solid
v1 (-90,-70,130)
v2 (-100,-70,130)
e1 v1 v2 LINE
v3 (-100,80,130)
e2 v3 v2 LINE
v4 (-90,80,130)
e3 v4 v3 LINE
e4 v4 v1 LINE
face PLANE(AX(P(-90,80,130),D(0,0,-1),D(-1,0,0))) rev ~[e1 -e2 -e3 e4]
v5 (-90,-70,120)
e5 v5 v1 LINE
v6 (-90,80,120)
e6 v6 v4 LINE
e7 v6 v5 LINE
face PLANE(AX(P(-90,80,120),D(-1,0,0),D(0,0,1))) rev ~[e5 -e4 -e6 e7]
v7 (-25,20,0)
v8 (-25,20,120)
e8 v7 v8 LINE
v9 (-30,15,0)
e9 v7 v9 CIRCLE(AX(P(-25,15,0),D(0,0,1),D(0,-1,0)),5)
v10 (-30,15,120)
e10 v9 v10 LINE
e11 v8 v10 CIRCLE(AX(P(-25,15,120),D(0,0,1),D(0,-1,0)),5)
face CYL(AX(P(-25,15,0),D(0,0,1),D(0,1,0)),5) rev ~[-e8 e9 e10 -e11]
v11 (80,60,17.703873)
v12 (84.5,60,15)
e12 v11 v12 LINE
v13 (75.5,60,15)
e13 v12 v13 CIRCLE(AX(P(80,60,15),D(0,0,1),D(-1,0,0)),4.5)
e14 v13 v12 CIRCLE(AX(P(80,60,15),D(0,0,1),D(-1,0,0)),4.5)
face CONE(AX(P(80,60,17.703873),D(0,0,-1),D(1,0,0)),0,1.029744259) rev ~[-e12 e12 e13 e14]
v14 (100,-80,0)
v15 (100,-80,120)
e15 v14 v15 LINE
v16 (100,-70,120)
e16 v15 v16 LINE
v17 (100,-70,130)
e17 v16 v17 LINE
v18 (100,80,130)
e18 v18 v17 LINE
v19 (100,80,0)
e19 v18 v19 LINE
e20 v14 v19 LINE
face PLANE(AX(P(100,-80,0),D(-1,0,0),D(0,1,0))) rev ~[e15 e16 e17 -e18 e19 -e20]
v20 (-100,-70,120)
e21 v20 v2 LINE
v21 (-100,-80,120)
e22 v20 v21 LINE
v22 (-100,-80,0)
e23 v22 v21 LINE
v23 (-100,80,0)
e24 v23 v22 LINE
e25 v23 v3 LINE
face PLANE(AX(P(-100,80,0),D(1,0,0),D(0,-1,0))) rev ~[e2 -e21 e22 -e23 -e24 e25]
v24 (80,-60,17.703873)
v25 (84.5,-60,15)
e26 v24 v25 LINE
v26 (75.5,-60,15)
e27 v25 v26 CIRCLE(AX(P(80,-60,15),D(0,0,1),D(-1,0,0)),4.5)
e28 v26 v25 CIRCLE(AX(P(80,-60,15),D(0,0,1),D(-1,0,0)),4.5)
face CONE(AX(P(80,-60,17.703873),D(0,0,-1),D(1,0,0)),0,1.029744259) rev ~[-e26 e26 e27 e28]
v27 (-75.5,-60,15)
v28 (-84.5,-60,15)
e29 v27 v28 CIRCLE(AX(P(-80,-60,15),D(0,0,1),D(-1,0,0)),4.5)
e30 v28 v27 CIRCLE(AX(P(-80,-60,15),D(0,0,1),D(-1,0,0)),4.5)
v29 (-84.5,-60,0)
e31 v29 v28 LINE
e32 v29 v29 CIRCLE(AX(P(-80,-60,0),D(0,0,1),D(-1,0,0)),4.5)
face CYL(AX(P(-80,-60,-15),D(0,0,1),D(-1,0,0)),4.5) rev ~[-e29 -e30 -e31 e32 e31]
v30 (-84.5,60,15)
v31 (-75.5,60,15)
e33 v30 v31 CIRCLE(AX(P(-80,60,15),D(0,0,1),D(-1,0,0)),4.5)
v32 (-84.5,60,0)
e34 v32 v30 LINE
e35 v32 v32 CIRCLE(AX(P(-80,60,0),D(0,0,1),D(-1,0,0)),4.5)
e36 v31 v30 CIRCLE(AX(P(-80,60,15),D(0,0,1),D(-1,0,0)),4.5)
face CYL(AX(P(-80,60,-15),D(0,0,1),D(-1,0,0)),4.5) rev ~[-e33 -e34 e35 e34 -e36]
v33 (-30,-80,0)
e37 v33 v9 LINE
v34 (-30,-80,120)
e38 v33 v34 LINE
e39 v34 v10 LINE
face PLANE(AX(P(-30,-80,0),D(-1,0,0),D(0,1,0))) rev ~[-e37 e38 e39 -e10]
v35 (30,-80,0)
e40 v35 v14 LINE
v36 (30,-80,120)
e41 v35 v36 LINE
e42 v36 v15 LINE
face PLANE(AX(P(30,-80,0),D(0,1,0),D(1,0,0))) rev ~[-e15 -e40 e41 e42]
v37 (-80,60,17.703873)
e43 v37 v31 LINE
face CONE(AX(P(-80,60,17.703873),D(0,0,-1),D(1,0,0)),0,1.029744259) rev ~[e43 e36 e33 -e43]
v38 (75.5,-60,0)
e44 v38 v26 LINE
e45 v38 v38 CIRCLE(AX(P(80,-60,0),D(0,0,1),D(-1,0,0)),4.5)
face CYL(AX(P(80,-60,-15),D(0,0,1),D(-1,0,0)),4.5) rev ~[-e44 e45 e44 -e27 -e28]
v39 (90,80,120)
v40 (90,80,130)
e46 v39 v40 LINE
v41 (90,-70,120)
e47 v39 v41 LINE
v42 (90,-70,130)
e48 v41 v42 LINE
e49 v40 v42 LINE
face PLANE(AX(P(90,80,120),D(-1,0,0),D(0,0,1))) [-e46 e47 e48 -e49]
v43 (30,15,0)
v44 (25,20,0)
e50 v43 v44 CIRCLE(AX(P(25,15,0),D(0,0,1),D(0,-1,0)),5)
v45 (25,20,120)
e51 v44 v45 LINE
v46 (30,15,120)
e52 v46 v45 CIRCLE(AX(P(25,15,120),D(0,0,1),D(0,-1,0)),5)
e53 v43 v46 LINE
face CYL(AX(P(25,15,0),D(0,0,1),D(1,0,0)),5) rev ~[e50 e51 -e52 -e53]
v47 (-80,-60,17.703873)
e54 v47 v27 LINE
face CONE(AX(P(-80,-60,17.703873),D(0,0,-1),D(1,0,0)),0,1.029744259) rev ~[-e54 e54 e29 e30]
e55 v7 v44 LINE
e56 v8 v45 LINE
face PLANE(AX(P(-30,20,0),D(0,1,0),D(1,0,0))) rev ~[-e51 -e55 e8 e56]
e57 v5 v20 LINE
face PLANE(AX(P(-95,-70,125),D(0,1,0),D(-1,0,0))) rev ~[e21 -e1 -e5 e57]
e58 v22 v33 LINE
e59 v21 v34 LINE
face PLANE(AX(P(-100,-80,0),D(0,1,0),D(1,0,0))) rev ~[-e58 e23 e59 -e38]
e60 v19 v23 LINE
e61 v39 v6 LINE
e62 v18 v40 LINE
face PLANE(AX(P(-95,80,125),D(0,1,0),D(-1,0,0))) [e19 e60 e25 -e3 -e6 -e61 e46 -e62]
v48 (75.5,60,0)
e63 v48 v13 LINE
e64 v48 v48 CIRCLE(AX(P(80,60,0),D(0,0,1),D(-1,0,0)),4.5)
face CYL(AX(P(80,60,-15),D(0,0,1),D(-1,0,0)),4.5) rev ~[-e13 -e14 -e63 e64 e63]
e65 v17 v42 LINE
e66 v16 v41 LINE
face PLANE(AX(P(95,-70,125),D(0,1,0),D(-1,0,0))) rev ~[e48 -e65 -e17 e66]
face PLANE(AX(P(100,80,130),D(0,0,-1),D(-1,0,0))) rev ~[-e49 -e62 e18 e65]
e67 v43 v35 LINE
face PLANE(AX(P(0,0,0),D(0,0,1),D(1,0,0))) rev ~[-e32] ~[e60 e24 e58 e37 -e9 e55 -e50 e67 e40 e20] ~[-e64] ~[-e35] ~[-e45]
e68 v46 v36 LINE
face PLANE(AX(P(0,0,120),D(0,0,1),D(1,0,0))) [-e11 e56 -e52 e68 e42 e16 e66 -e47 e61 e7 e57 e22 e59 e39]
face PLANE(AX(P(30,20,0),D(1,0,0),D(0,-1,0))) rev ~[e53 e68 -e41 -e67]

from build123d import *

# Parameters (mm, degrees)
F1_DEPTH = 120
F4_W     = 10
F4_H     = 10
F5_DEPTH = 150
F6_D     = 9
F6_DEPTH = 15
F6_TIP   = 2.7038727856
F7_R     = 5


# Not quite as in the source:
# - a feature names something its author has since deleted; it is built from what else it names


with BuildPart() as f1:
    # F0 (on Top) → F1 (new body)
    with BuildSketch(Plane.XY):
        Polygon((100, -80), (100, 80), (-100, 80), (-100, -80), (-55, -80), (-30, -80), (-30, -10), (-30, 20), (30, 20), (30, -16.3740634173), (30, -80), (55, -80), align=None)
    extrude(amount=F1_DEPTH)

    # F4 (on face) → F5 (join)
    with BuildSketch(Plane(origin=(0, 80, 0), x_dir=(-1, 0, 0), z_dir=(0, 1, 0))):
        with Locations((95, 125)):
            Rectangle(F4_W, F4_H)
        with Locations((-95, 125)):
            Rectangle(F4_W, F4_H)
    extrude(amount=-F5_DEPTH)

    # F6
    with Locations(Plane(origin=(0, 0, 0), x_dir=(1, 0, 0), z_dir=(0, 0, -1))):
        with Locations((-80, -60), (-80, 60), (80, 60), (80, -60)):
            Hole(F6_D / 2, depth=F6_DEPTH)
            with Locations((0, 0, -(F6_DEPTH + F6_TIP / 2))):  # 118° drill point
                Cone(0, F6_D / 2, F6_TIP, mode=Mode.SUBTRACT)

    # F7
    f7_edges = [f1.edges().sort_by_distance(p)[0] for p in [
        (-30, 20, 60),
        (30, 20, 60),
    ]]
    fillet(f7_edges, radius=F7_R)


solid = f1.part
